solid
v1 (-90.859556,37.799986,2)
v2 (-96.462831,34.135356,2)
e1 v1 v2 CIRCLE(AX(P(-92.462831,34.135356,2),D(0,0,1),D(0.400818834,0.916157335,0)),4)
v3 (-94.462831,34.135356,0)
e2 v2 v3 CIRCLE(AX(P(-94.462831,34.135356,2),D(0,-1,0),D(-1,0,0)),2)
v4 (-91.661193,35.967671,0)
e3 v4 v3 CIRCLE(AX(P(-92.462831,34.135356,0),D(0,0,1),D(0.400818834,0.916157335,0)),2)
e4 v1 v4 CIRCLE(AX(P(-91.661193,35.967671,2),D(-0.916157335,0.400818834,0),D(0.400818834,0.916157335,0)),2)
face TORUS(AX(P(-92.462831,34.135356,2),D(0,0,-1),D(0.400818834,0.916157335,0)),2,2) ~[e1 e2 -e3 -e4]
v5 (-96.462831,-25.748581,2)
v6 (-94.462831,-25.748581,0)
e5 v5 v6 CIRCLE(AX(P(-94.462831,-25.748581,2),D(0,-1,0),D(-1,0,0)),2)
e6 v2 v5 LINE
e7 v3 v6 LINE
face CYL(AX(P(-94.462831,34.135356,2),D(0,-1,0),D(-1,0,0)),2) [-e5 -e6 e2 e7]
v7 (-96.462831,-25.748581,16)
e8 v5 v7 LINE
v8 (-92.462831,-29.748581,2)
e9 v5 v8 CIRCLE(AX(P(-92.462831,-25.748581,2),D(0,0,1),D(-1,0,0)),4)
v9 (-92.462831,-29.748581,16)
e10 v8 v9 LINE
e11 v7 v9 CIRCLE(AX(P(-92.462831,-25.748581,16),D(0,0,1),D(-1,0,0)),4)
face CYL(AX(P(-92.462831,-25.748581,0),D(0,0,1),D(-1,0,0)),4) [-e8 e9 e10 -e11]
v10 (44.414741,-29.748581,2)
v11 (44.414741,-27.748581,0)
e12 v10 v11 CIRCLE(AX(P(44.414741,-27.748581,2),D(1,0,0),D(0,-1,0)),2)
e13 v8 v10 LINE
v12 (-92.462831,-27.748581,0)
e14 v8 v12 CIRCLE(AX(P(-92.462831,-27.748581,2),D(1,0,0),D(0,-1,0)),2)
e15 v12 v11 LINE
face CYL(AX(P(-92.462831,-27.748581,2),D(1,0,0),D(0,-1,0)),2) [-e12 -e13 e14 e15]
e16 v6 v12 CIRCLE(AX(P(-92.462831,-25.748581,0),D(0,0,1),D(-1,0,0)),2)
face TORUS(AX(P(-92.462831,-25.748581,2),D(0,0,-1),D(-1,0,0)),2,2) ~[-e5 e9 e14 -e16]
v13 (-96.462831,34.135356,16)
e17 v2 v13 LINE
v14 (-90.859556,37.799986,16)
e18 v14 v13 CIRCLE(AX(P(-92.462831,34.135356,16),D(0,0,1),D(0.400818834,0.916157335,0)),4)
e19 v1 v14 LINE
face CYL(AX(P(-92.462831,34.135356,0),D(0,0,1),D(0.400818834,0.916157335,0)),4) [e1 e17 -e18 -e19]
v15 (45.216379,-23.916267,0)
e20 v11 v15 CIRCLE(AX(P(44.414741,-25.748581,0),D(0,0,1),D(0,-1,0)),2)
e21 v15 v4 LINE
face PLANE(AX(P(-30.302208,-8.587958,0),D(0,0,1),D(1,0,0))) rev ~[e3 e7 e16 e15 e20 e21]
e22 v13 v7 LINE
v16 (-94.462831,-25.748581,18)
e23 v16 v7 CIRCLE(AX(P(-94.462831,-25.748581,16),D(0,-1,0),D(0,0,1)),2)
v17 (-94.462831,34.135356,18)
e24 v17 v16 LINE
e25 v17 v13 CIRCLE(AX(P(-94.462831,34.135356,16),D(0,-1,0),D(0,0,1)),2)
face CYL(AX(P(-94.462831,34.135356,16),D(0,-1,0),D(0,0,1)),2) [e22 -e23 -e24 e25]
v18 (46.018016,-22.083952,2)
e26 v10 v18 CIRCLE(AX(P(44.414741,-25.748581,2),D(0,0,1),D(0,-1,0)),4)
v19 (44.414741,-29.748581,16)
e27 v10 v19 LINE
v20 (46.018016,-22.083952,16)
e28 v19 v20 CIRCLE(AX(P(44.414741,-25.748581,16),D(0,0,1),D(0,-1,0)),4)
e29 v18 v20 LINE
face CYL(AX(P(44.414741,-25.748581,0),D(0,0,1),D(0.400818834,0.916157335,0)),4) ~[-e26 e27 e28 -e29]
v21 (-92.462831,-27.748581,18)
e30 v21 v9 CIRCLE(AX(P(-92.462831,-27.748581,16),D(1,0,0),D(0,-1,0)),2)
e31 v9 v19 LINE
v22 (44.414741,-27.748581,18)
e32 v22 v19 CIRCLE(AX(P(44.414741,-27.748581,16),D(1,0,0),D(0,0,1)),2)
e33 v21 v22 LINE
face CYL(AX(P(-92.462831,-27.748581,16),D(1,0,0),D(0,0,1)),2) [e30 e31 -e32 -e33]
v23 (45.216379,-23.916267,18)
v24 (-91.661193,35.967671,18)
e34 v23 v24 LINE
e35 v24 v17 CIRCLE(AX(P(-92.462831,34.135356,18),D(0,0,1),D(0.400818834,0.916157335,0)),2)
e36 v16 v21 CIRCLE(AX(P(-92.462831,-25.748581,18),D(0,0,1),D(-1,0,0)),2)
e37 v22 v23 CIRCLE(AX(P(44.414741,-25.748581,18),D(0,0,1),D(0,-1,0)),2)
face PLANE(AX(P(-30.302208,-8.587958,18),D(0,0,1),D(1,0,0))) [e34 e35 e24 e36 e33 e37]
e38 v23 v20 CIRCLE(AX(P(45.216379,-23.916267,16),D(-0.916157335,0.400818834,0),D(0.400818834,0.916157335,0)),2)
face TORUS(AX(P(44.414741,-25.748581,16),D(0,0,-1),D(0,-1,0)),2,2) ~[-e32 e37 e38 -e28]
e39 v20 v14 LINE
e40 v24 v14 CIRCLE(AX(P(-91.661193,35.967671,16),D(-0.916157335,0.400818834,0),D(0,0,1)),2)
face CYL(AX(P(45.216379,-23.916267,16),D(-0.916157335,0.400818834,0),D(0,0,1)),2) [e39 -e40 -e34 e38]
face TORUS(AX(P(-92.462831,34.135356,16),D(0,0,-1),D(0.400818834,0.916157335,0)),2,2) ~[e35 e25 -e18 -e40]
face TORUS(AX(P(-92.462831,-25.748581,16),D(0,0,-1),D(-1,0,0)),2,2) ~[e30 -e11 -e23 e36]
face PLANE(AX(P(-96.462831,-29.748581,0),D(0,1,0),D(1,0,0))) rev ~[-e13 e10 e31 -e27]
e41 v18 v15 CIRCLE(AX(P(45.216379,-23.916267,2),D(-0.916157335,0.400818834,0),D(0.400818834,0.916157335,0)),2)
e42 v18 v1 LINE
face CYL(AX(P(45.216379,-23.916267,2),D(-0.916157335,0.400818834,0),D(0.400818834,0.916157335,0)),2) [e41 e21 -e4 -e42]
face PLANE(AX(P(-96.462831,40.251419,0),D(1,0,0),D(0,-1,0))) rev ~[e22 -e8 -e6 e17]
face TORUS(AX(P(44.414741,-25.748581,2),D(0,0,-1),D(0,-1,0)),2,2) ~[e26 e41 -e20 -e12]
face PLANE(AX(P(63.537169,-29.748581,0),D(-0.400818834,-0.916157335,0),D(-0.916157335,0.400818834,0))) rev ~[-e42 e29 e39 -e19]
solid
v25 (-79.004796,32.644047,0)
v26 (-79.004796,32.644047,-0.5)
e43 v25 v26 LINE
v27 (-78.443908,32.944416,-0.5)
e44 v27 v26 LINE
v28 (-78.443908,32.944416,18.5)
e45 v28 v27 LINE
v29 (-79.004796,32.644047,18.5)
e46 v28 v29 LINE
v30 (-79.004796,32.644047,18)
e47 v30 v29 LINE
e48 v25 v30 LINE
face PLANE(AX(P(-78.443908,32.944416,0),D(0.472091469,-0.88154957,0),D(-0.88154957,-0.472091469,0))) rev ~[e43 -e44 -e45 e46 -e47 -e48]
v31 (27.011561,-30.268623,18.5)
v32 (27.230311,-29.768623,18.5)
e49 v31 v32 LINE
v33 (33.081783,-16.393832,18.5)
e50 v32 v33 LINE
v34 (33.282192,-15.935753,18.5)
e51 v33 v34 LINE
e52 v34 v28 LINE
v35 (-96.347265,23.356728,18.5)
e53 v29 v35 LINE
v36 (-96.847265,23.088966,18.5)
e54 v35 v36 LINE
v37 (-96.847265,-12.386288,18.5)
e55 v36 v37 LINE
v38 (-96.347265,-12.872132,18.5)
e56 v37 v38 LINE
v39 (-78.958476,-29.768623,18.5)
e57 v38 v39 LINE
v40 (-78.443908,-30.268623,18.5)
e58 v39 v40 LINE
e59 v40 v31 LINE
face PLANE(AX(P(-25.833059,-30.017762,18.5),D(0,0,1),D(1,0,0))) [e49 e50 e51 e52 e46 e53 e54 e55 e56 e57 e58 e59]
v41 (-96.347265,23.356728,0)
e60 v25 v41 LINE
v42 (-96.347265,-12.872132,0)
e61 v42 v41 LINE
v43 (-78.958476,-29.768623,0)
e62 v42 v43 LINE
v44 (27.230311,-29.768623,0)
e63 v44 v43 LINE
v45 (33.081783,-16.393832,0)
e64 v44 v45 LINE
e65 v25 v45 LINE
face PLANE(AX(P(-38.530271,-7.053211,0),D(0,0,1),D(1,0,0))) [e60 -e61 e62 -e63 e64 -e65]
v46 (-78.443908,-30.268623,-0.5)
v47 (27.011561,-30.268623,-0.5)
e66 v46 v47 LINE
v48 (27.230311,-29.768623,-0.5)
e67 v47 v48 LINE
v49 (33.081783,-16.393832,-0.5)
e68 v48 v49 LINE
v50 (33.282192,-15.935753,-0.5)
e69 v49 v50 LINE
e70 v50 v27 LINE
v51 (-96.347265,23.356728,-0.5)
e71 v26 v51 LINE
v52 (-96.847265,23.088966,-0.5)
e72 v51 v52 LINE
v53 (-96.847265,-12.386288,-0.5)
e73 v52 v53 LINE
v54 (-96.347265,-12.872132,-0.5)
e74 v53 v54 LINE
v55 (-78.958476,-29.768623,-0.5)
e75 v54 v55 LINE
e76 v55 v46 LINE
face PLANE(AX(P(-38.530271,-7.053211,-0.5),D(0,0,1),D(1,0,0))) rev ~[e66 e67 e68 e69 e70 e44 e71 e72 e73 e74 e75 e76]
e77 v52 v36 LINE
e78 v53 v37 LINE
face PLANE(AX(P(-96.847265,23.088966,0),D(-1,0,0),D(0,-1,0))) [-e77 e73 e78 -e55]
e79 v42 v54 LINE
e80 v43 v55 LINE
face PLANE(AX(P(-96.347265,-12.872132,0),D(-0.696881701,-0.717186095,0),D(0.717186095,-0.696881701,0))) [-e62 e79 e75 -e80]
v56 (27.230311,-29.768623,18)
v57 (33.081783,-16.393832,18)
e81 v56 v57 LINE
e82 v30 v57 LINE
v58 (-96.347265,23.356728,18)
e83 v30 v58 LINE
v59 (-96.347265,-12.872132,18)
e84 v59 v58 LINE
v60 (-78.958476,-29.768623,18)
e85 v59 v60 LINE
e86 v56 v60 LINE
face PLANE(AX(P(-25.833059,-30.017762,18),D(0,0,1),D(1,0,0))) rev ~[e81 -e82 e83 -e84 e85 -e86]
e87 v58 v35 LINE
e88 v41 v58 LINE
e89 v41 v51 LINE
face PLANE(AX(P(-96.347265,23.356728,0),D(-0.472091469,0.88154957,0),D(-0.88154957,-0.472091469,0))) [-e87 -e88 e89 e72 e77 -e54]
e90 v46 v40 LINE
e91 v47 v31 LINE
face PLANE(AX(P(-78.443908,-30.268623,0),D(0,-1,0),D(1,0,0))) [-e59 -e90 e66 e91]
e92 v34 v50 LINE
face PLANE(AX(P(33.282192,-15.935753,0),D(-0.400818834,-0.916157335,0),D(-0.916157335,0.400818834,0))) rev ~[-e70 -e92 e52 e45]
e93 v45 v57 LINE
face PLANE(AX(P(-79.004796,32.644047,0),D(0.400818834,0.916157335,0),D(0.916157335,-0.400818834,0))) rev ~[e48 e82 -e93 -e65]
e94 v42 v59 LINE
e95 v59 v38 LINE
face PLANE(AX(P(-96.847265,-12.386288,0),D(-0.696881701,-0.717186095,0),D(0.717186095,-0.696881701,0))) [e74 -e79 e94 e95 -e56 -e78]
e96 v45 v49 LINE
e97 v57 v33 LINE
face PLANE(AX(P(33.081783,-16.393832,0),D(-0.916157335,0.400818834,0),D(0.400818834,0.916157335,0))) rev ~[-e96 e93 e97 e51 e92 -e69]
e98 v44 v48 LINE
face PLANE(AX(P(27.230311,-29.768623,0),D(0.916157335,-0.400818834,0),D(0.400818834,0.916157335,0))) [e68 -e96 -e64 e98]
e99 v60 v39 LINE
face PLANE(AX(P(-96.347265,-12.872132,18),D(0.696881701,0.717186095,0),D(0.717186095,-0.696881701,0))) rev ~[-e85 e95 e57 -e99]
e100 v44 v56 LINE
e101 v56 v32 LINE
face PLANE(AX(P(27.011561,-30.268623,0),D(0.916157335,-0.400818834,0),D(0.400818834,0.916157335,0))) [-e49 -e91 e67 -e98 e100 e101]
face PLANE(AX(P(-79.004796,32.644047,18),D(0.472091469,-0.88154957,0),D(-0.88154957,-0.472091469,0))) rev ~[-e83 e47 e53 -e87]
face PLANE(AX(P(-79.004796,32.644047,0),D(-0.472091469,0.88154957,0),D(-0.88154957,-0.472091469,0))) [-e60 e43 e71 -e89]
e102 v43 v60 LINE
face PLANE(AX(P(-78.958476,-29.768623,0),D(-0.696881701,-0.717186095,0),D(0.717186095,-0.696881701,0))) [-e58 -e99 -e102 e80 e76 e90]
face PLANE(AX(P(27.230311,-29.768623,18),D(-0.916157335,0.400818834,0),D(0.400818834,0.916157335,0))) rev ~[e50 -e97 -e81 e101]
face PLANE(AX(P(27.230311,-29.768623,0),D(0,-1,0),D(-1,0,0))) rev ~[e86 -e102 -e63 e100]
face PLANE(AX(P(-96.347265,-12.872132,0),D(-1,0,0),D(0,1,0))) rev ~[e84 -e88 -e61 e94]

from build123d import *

# Parameters (mm, degrees)
F2_DEPTH = 18
F3_START = 18
F3_DEPTH = 0.5
F4_DEPTH = 0.5
F5_DEPTH = 18
F6_R     = 4
F7_R     = 2


with BuildPart() as f2:
    # F0 (on Top) → F2 (new body)
    with BuildSketch(Plane.XY):
        Polygon((63.5371690989, -29.7485813498), (-96.4628309011, 40.2514186502), (-96.4628309011, -29.7485813498), align=None)
    extrude(amount=F2_DEPTH)

    # F6
    f6_edges = [f2.edges().sort_by_distance(p)[0] for p in [
        (63.537169, -29.748581, 9),
        (-96.462831, 40.251419, 9),
        (-96.462831, -29.748581, 9),
    ]]
    fillet(f6_edges, radius=F6_R)

    # F7
    f7_edges = [f2.edges().sort_by_distance(p)[0] for p in [
        (-96.462831, 4.193388, 18),
        (-24.024045, -29.748581, 18),
        (-95.291258, -28.577008, 18),
        (48.330001, -26.567569, 18),
        (-22.42077, 7.858017, 18),
        (-94.652226, 37.482975, 18),
        (-22.42077, 7.858017, 0),
        (-94.652226, 37.482975, 0),
        (-96.462831, 4.193388, 0),
        (-95.291258, -28.577008, 0),
        (-24.024045, -29.748581, 0),
        (48.330001, -26.567569, 0),
    ]]
    fillet(f7_edges, radius=F7_R)


with BuildPart() as f3:
    # F1 (on Top) → F3 (new body)
    with BuildSketch(Plane.XY.offset(F3_START)):
        Polygon((27.2303114762, -29.7686234117), (-78.958476275, -29.7686234117), (-78.4439082405, -30.2686234117), (27.0115614762, -30.2686234117), align=None)
        Polygon((-78.4439082405, 32.9444158173), (-79.0047962132, 32.644046518), (33.0817828051, -16.3938318026), (33.2821922221, -15.9357531351), align=None)
        Polygon((-79.0047962132, 32.644046518), (-96.3472649455, 23.3567281295), (-96.3472649455, -12.8721320786), (-78.958476275, -29.7686234117), (27.2303114762, -29.7686234117), (33.0817828051, -16.3938318026), align=None)
        Polygon((-96.3472649455, -12.8721320786), (-96.3472649455, 23.3567281295), (-96.8472649455, 23.0889658365), (-96.8472649455, -12.3862876747), align=None)
    extrude(amount=F3_DEPTH)



with BuildPart() as f4:
    # F1 (on Top) → F4 (new body)
    with BuildSketch(Plane.XY):
        Polygon((-79.0047962132, 32.644046518), (-96.3472649455, 23.3567281295), (-96.3472649455, -12.8721320786), (-78.958476275, -29.7686234117), (27.2303114762, -29.7686234117), (33.0817828051, -16.3938318026), align=None)
        Polygon((-96.3472649455, -12.8721320786), (-96.3472649455, 23.3567281295), (-96.8472649455, 23.0889658365), (-96.8472649455, -12.3862876747), align=None)
        Polygon((-78.4439082405, 32.9444158173), (-79.0047962132, 32.644046518), (33.0817828051, -16.3938318026), (33.2821922221, -15.9357531351), align=None)
        Polygon((27.2303114762, -29.7686234117), (-78.958476275, -29.7686234117), (-78.4439082405, -30.2686234117), (27.0115614762, -30.2686234117), align=None)
    extrude(amount=-F4_DEPTH)


with BuildPart() as f3_1:
    add(f3.part)

    add(f4.part)  # F5 merges F4
    # F1 (on Top) → F5 (join)
    with BuildSketch(Plane.XY):
        Polygon((-78.4439082405, 32.9444158173), (-79.0047962132, 32.644046518), (33.0817828051, -16.3938318026), (33.2821922221, -15.9357531351), align=None)
        Polygon((-96.3472649455, -12.8721320786), (-96.3472649455, 23.3567281295), (-96.8472649455, 23.0889658365), (-96.8472649455, -12.3862876747), align=None)
        Polygon((27.2303114762, -29.7686234117), (-78.958476275, -29.7686234117), (-78.4439082405, -30.2686234117), (27.0115614762, -30.2686234117), align=None)
    extrude(amount=F5_DEPTH)


solid = Compound([f2.part, f3_1.part])
